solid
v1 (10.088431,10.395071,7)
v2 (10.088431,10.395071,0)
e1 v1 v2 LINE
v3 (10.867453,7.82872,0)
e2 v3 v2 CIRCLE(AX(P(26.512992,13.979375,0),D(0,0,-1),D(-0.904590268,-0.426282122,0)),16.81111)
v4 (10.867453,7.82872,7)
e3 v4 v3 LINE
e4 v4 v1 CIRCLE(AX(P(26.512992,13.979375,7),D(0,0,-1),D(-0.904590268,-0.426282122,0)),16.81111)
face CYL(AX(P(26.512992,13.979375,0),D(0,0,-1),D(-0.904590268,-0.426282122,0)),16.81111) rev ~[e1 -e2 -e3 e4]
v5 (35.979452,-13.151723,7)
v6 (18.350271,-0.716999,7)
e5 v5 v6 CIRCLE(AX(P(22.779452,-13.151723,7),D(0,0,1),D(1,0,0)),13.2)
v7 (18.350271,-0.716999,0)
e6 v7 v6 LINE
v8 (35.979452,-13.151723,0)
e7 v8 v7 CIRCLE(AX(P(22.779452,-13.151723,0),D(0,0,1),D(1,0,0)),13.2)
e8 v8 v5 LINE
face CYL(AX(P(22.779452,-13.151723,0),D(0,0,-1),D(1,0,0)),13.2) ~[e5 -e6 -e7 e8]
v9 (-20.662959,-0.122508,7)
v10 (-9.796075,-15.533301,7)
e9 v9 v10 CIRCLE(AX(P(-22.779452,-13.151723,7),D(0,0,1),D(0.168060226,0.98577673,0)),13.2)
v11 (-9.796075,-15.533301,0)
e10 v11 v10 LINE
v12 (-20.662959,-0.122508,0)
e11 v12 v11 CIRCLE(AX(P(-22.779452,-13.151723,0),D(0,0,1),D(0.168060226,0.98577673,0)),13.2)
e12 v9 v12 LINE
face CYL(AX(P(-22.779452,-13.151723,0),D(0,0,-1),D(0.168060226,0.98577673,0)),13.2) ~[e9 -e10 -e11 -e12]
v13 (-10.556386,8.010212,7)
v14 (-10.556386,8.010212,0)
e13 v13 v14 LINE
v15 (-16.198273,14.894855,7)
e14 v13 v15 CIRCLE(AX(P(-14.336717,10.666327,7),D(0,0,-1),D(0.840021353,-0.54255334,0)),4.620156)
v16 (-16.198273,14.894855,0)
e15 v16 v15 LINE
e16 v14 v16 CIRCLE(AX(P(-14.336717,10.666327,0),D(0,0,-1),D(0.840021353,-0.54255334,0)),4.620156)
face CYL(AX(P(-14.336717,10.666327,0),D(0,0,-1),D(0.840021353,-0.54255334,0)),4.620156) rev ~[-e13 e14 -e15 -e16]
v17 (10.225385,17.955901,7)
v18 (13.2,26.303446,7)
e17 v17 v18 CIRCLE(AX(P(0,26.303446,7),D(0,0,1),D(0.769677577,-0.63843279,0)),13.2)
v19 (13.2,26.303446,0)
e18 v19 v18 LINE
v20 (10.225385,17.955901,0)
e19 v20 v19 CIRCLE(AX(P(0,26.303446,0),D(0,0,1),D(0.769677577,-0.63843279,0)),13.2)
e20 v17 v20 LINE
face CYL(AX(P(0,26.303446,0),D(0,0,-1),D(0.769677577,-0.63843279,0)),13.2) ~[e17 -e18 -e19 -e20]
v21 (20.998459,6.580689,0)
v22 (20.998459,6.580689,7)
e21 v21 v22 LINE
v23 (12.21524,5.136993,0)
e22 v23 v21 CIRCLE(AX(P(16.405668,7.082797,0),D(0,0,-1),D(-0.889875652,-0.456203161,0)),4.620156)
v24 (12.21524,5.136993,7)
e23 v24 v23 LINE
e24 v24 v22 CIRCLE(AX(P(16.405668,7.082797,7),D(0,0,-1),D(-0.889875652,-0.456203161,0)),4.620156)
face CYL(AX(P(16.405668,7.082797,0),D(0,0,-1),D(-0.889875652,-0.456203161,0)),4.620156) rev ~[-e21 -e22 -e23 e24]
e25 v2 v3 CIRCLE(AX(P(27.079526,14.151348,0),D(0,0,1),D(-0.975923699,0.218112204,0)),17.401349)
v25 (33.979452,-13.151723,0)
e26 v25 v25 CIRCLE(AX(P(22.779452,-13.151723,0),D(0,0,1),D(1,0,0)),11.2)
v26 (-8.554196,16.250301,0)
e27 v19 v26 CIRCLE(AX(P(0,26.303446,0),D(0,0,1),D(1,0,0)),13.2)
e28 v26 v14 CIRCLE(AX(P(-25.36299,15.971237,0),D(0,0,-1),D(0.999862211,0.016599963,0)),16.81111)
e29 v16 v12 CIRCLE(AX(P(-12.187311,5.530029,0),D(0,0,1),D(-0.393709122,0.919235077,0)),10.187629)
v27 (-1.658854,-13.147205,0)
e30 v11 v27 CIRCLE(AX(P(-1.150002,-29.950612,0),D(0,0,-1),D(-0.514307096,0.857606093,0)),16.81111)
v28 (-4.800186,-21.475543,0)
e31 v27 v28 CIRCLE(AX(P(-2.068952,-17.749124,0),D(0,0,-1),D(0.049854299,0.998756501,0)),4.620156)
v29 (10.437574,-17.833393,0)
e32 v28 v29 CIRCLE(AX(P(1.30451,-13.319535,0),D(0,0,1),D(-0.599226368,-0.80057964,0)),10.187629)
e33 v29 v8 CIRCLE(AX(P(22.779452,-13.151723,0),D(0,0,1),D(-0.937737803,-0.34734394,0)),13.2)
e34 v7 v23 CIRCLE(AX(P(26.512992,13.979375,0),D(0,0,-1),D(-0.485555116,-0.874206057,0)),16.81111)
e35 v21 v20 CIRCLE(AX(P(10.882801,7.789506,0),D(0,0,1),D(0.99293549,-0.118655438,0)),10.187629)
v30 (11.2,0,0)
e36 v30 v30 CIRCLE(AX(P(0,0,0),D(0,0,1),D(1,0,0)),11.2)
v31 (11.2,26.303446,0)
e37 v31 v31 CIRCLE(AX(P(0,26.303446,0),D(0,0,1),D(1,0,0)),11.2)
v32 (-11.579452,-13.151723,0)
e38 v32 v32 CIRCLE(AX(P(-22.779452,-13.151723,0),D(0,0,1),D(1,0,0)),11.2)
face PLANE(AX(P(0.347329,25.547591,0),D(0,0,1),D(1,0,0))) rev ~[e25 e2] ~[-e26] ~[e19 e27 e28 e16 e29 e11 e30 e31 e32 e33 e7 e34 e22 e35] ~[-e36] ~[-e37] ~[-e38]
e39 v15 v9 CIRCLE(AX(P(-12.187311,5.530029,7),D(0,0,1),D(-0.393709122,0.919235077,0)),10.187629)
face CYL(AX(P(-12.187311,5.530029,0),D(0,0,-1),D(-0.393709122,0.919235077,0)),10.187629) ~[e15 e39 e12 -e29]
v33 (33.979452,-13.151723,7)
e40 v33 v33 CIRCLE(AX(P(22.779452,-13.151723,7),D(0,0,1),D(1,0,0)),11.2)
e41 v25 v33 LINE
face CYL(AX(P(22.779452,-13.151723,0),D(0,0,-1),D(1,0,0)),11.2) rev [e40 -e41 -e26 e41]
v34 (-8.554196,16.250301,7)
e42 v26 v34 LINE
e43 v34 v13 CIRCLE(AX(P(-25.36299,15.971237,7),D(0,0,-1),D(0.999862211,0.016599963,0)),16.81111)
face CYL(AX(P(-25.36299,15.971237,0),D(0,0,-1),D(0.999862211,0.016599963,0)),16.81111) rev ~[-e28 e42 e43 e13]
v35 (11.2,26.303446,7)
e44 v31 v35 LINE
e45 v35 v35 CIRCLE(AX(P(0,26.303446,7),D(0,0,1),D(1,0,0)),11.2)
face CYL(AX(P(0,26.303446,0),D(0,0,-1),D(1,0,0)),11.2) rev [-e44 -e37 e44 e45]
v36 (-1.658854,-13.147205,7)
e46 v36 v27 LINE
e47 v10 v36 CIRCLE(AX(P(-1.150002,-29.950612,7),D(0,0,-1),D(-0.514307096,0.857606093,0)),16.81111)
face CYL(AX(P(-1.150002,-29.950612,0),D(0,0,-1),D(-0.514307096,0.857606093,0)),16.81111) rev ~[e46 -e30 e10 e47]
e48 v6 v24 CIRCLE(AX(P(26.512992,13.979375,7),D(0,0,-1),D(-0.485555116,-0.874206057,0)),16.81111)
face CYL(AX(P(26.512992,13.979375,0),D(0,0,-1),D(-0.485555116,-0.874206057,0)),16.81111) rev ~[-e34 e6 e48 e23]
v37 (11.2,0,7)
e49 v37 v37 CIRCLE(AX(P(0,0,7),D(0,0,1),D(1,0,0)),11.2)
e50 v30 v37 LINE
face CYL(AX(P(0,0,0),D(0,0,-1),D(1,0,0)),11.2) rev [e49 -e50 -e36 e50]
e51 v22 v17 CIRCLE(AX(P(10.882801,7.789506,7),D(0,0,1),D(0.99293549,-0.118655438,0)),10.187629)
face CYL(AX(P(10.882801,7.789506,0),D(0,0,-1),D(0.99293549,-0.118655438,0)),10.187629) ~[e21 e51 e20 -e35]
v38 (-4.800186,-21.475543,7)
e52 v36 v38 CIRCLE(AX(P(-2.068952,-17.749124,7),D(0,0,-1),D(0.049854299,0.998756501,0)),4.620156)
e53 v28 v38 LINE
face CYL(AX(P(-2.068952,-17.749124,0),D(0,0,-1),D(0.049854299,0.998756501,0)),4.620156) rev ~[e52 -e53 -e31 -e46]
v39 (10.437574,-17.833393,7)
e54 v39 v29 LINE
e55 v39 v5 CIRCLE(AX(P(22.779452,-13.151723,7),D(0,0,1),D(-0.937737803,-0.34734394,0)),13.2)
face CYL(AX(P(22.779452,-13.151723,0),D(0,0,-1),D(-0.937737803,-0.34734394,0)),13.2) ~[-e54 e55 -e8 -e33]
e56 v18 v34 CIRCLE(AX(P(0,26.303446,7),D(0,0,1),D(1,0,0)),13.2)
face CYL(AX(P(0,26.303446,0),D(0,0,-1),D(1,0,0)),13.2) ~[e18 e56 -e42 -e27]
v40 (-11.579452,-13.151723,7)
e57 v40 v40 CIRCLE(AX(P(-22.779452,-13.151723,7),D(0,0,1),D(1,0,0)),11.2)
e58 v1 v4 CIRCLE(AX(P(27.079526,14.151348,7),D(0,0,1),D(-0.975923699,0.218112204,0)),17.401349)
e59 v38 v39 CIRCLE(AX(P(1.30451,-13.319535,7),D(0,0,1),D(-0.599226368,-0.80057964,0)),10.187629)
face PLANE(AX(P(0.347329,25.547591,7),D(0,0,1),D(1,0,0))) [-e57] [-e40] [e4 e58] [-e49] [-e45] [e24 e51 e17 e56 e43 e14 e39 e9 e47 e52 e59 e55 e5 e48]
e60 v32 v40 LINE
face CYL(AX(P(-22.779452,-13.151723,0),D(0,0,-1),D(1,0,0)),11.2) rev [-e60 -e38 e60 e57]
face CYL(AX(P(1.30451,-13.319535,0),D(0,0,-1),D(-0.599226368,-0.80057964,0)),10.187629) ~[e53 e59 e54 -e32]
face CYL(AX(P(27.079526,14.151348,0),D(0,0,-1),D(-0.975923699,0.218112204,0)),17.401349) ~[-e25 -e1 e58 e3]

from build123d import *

# Parameters (mm, degrees)
F0_R     = 11.2
F1_DEPTH = 7
F3_DEPTH = 7


with BuildPart() as f1:
    # F0 (on Top) → F1 (new body)
    with BuildSketch(Plane.XY):
        with BuildLine():
            ThreePointArc((10.1597440205, 17.8761330961), (12.4166948314, 21.8239716806), (13.2, 26.3034459203))
            ThreePointArc((13.2, 26.3034459203), (-5.5373555744, 38.2858368855), (-8.5541959459, 16.2503005558))
            ThreePointArc((-8.5541959459, 16.2503005558), (-5.0829218379, 14.1213317529), (-1.12791098, 13.1517229602))
            ThreePointArc((-1.12791098, 13.1517229602), (0, 13.2), (1.12791098, 13.1517229602))
            ThreePointArc((1.12791098, 13.1517229602), (6.1182351733, 14.606984987), (10.1597440205, 17.8761330961))
        make_face()
        with Locations((0, 26.3034459203)):
            Circle(F0_R, mode=Mode.SUBTRACT)
        with BuildLine():
            ThreePointArc((-1.12791098, 13.1517229602), (-5.0829218379, 14.1213317529), (-8.5541959459, 16.2503005558))
            ThreePointArc((-8.5541959459, 16.2503005558), (-9.0756063849, 11.8077563343), (-10.7501080818, 7.6599723387))
            ThreePointArc((-10.7501080818, 7.6599723387), (-6.5430623893, 11.4642197541), (-1.12791098, 13.1517229602))
        make_face()
        with BuildLine():
            ThreePointArc((11.3058248826, 6.8130994213), (9.7913703879, 12.2470899677), (10.1597440205, 17.8761330961))
            ThreePointArc((10.1597440205, 17.8761330961), (6.1182351733, 14.606984987), (1.12791098, 13.1517229602))
            ThreePointArc((1.12791098, 13.1517229602), (6.9781074775, 11.204731859), (11.3058248826, 6.8130994213))
        make_face()
        with BuildLine():
            ThreePointArc((1.12791098, 13.1517229602), (0, 13.2), (-1.12791098, 13.1517229602))
            ThreePointArc((-1.12791098, 13.1517229602), (0, 13.1034459203), (1.12791098, 13.1517229602))
        make_face()
        with BuildLine():
            ThreePointArc((1.12791098, 13.1517229602), (0, 13.1034459203), (-1.12791098, 13.1517229602))
            ThreePointArc((-1.12791098, 13.1517229602), (-6.5430623893, 11.4642197541), (-10.7501080818, 7.6599723387))
            ThreePointArc((-10.7501080818, 7.6599723387), (-11.1373686058, 7.0132721384), (-11.5532296186, 6.3845818484))
            ThreePointArc((-11.5532296186, 6.3845818484), (-13.1926361713, 0.4408524163), (-11.9536816771, -5.5990619182))
            ThreePointArc((-11.9536816771, -5.5990619182), (-11.3479170441, -6.5517229602), (-10.825770697, -7.552661042))
            ThreePointArc((-10.825770697, -7.552661042), (-6.6567743469, -11.3985681247), (-1.2586765967, -13.1398528616))
            ThreePointArc((-1.2586765967, -13.1398528616), (-0.5049875326, -13.1518802131), (0.247404736, -13.1976812697))
            ThreePointArc((0.247404736, -13.1976812697), (6.2145286938, -11.6455842754), (10.825770697, -7.552661042))
            ThreePointArc((10.825770697, -7.552661042), (11.3479170441, -6.5517229602), (11.9536816771, -5.5990619182))
            ThreePointArc((11.9536816771, -5.5990619182), (12.8846536263, -2.8680482791), (13.2, 0))
            ThreePointArc((13.2, 0), (12.8987588115, 2.8039295858), (12.0087846785, 5.4798805229))
            ThreePointArc((12.0087846785, 5.4798805229), (11.6423561384, 6.1386080748), (11.3058248826, 6.8130994213))
            ThreePointArc((11.3058248826, 6.8130994213), (6.9781074775, 11.204731859), (1.12791098, 13.1517229602))
        make_face()
        Circle(F0_R, mode=Mode.SUBTRACT)
        with BuildLine():
            ThreePointArc((12.0087846785, 5.4798805229), (11.6763488687, 6.1565312552), (11.3058248826, 6.8130994213))
            ThreePointArc((11.3058248826, 6.8130994213), (11.6423561384, 6.1386080748), (12.0087846785, 5.4798805229))
        make_face()
        with BuildLine():
            ThreePointArc((-11.9536816771, -5.5990619182), (-13.1926361713, 0.4408524163), (-11.5532296186, 6.3845818484))
            ThreePointArc((-11.5532296186, 6.3845818484), (-15.5019762284, 2.35603051), (-20.5610573929, -0.1394701303))
            ThreePointArc((-20.5610573929, -0.1394701303), (-15.7091376581, -2.0049454071), (-11.9536816771, -5.5990619182))
        make_face()
        with BuildLine():
            ThreePointArc((18.3502710734, -0.7169992799), (14.7636201396, 1.955827517), (12.0087846785, 5.4798805229))
            ThreePointArc((12.0087846785, 5.4798805229), (12.8987588115, 2.8039295858), (13.2, 0))
            ThreePointArc((13.2, 0), (12.8846536263, -2.8680482791), (11.9536816771, -5.5990619182))
            ThreePointArc((11.9536816771, -5.5990619182), (14.7708929522, -2.6587264394), (18.3502710734, -0.7169992799))
        make_face()
        with BuildLine():
            ThreePointArc((-10.825770697, -7.552661042), (-11.3479170441, -6.5517229602), (-11.9536816771, -5.5990619182))
            ThreePointArc((-11.9536816771, -5.5990619182), (-11.43153533, -6.6), (-10.825770697, -7.552661042))
        make_face()
        with BuildLine():
            ThreePointArc((-10.825770697, -7.552661042), (-11.43153533, -6.6), (-11.9536816771, -5.5990619182))
            ThreePointArc((-11.9536816771, -5.5990619182), (-15.7091376581, -2.0049454071), (-20.5610573929, -0.1394701303))
            ThreePointArc((-20.5610573929, -0.1394701303), (-33.5968448072, -20.7163789966), (-9.7960751276, -15.533301276))
            ThreePointArc((-9.7960751276, -15.533301276), (-9.633719613, -14.3474278455), (-9.5794523741, -13.1517229602))
            ThreePointArc((-9.5794523741, -13.1517229602), (-9.8947987478, -10.283674681), (-10.825770697, -7.552661042))
        make_face()
        with Locations((-22.7794523741, -13.1517229602)):
            Circle(F0_R, mode=Mode.SUBTRACT)
        with BuildLine():
            ThreePointArc((35.9794523741, -13.1517229602), (30.3878295608, -2.3650368804), (18.3502710734, -0.7169992799))
            ThreePointArc((18.3502710734, -0.7169992799), (14.7708929522, -2.6587264394), (11.9536816771, -5.5990619182))
            ThreePointArc((11.9536816771, -5.5990619182), (11.43153533, -6.6), (10.825770697, -7.552661042))
            ThreePointArc((10.825770697, -7.552661042), (9.5909024848, -12.6020395799), (10.4013133724, -17.7366629658))
            ThreePointArc((10.4013133724, -17.7366629658), (25.1084613025, -26.1446332351), (35.9794523741, -13.1517229602))
        make_face()
        with Locations((22.7794523741, -13.1517229602)):
            Circle(F0_R, mode=Mode.SUBTRACT)
        with BuildLine():
            ThreePointArc((-1.2586765967, -13.1398528616), (-6.6567743469, -11.3985681247), (-10.825770697, -7.552661042))
            ThreePointArc((-10.825770697, -7.552661042), (-9.8947987478, -10.283674681), (-9.5794523741, -13.1517229602))
            ThreePointArc((-9.5794523741, -13.1517229602), (-9.633719613, -14.3474278455), (-9.7960751276, -15.533301276))
            ThreePointArc((-9.7960751276, -15.533301276), (-5.6880137547, -13.7635838512), (-1.2586765967, -13.1398528616))
        make_face()
        with BuildLine():
            ThreePointArc((10.825770697, -7.552661042), (11.43153533, -6.6), (11.9536816771, -5.5990619182))
            ThreePointArc((11.9536816771, -5.5990619182), (11.3479170441, -6.5517229602), (10.825770697, -7.552661042))
        make_face()
        with BuildLine():
            ThreePointArc((10.4013133724, -17.7366629658), (9.5909024848, -12.6020395799), (10.825770697, -7.552661042))
            ThreePointArc((10.825770697, -7.552661042), (6.2145286938, -11.6455842754), (0.247404736, -13.1976812697))
            ThreePointArc((0.247404736, -13.1976812697), (5.7106058405, -14.6031204777), (10.4013133724, -17.7366629658))
        make_face()
    extrude(amount=F1_DEPTH)

    # F2 (on Top) → F3 (join)
    with BuildSketch(Plane.XY):
        with BuildLine():
            ThreePointArc((12.2943036258, 4.9750674516), (15.5675466721, 11.6262977505), (20.9984593093, 6.580688525))
            ThreePointArc((20.9984593093, 6.580688525), (18.2353036168, 14.8413488661), (10.0971376523, 17.9467946291))
            ThreePointArc((10.0971376523, 17.9467946291), (9.9225536839, 11.2452805665), (12.2943036258, 4.9750674516))
        make_face()
        with BuildLine():
            ThreePointArc((-1.8386170143, -13.1347129876), (2.2848958678, -19.2950397679), (-4.8001862176, -21.4755434647))
            ThreePointArc((-4.8001862176, -21.4755434647), (3.735333336, -23.2129106109), (10.4938112391, -17.717775027))
            ThreePointArc((10.4938112391, -17.717775027), (4.7859075855, -14.1929896942), (-1.8386170143, -13.1347129876))
        make_face()
        with BuildLine():
            ThreePointArc((-10.4556866115, 8.159645536), (-17.85244254, 7.6687420174), (-16.1982730917, 14.8948549397))
            ThreePointArc((-16.1982730917, 14.8948549397), (-21.9706369528, 8.3715617448), (-20.5909488915, -0.2290196021))
            ThreePointArc((-20.5909488915, -0.2290196021), (-14.6756844073, 2.9411945739), (-10.4556866115, 8.159645536))
        make_face()
    extrude(amount=F3_DEPTH)


solid = f1.part
